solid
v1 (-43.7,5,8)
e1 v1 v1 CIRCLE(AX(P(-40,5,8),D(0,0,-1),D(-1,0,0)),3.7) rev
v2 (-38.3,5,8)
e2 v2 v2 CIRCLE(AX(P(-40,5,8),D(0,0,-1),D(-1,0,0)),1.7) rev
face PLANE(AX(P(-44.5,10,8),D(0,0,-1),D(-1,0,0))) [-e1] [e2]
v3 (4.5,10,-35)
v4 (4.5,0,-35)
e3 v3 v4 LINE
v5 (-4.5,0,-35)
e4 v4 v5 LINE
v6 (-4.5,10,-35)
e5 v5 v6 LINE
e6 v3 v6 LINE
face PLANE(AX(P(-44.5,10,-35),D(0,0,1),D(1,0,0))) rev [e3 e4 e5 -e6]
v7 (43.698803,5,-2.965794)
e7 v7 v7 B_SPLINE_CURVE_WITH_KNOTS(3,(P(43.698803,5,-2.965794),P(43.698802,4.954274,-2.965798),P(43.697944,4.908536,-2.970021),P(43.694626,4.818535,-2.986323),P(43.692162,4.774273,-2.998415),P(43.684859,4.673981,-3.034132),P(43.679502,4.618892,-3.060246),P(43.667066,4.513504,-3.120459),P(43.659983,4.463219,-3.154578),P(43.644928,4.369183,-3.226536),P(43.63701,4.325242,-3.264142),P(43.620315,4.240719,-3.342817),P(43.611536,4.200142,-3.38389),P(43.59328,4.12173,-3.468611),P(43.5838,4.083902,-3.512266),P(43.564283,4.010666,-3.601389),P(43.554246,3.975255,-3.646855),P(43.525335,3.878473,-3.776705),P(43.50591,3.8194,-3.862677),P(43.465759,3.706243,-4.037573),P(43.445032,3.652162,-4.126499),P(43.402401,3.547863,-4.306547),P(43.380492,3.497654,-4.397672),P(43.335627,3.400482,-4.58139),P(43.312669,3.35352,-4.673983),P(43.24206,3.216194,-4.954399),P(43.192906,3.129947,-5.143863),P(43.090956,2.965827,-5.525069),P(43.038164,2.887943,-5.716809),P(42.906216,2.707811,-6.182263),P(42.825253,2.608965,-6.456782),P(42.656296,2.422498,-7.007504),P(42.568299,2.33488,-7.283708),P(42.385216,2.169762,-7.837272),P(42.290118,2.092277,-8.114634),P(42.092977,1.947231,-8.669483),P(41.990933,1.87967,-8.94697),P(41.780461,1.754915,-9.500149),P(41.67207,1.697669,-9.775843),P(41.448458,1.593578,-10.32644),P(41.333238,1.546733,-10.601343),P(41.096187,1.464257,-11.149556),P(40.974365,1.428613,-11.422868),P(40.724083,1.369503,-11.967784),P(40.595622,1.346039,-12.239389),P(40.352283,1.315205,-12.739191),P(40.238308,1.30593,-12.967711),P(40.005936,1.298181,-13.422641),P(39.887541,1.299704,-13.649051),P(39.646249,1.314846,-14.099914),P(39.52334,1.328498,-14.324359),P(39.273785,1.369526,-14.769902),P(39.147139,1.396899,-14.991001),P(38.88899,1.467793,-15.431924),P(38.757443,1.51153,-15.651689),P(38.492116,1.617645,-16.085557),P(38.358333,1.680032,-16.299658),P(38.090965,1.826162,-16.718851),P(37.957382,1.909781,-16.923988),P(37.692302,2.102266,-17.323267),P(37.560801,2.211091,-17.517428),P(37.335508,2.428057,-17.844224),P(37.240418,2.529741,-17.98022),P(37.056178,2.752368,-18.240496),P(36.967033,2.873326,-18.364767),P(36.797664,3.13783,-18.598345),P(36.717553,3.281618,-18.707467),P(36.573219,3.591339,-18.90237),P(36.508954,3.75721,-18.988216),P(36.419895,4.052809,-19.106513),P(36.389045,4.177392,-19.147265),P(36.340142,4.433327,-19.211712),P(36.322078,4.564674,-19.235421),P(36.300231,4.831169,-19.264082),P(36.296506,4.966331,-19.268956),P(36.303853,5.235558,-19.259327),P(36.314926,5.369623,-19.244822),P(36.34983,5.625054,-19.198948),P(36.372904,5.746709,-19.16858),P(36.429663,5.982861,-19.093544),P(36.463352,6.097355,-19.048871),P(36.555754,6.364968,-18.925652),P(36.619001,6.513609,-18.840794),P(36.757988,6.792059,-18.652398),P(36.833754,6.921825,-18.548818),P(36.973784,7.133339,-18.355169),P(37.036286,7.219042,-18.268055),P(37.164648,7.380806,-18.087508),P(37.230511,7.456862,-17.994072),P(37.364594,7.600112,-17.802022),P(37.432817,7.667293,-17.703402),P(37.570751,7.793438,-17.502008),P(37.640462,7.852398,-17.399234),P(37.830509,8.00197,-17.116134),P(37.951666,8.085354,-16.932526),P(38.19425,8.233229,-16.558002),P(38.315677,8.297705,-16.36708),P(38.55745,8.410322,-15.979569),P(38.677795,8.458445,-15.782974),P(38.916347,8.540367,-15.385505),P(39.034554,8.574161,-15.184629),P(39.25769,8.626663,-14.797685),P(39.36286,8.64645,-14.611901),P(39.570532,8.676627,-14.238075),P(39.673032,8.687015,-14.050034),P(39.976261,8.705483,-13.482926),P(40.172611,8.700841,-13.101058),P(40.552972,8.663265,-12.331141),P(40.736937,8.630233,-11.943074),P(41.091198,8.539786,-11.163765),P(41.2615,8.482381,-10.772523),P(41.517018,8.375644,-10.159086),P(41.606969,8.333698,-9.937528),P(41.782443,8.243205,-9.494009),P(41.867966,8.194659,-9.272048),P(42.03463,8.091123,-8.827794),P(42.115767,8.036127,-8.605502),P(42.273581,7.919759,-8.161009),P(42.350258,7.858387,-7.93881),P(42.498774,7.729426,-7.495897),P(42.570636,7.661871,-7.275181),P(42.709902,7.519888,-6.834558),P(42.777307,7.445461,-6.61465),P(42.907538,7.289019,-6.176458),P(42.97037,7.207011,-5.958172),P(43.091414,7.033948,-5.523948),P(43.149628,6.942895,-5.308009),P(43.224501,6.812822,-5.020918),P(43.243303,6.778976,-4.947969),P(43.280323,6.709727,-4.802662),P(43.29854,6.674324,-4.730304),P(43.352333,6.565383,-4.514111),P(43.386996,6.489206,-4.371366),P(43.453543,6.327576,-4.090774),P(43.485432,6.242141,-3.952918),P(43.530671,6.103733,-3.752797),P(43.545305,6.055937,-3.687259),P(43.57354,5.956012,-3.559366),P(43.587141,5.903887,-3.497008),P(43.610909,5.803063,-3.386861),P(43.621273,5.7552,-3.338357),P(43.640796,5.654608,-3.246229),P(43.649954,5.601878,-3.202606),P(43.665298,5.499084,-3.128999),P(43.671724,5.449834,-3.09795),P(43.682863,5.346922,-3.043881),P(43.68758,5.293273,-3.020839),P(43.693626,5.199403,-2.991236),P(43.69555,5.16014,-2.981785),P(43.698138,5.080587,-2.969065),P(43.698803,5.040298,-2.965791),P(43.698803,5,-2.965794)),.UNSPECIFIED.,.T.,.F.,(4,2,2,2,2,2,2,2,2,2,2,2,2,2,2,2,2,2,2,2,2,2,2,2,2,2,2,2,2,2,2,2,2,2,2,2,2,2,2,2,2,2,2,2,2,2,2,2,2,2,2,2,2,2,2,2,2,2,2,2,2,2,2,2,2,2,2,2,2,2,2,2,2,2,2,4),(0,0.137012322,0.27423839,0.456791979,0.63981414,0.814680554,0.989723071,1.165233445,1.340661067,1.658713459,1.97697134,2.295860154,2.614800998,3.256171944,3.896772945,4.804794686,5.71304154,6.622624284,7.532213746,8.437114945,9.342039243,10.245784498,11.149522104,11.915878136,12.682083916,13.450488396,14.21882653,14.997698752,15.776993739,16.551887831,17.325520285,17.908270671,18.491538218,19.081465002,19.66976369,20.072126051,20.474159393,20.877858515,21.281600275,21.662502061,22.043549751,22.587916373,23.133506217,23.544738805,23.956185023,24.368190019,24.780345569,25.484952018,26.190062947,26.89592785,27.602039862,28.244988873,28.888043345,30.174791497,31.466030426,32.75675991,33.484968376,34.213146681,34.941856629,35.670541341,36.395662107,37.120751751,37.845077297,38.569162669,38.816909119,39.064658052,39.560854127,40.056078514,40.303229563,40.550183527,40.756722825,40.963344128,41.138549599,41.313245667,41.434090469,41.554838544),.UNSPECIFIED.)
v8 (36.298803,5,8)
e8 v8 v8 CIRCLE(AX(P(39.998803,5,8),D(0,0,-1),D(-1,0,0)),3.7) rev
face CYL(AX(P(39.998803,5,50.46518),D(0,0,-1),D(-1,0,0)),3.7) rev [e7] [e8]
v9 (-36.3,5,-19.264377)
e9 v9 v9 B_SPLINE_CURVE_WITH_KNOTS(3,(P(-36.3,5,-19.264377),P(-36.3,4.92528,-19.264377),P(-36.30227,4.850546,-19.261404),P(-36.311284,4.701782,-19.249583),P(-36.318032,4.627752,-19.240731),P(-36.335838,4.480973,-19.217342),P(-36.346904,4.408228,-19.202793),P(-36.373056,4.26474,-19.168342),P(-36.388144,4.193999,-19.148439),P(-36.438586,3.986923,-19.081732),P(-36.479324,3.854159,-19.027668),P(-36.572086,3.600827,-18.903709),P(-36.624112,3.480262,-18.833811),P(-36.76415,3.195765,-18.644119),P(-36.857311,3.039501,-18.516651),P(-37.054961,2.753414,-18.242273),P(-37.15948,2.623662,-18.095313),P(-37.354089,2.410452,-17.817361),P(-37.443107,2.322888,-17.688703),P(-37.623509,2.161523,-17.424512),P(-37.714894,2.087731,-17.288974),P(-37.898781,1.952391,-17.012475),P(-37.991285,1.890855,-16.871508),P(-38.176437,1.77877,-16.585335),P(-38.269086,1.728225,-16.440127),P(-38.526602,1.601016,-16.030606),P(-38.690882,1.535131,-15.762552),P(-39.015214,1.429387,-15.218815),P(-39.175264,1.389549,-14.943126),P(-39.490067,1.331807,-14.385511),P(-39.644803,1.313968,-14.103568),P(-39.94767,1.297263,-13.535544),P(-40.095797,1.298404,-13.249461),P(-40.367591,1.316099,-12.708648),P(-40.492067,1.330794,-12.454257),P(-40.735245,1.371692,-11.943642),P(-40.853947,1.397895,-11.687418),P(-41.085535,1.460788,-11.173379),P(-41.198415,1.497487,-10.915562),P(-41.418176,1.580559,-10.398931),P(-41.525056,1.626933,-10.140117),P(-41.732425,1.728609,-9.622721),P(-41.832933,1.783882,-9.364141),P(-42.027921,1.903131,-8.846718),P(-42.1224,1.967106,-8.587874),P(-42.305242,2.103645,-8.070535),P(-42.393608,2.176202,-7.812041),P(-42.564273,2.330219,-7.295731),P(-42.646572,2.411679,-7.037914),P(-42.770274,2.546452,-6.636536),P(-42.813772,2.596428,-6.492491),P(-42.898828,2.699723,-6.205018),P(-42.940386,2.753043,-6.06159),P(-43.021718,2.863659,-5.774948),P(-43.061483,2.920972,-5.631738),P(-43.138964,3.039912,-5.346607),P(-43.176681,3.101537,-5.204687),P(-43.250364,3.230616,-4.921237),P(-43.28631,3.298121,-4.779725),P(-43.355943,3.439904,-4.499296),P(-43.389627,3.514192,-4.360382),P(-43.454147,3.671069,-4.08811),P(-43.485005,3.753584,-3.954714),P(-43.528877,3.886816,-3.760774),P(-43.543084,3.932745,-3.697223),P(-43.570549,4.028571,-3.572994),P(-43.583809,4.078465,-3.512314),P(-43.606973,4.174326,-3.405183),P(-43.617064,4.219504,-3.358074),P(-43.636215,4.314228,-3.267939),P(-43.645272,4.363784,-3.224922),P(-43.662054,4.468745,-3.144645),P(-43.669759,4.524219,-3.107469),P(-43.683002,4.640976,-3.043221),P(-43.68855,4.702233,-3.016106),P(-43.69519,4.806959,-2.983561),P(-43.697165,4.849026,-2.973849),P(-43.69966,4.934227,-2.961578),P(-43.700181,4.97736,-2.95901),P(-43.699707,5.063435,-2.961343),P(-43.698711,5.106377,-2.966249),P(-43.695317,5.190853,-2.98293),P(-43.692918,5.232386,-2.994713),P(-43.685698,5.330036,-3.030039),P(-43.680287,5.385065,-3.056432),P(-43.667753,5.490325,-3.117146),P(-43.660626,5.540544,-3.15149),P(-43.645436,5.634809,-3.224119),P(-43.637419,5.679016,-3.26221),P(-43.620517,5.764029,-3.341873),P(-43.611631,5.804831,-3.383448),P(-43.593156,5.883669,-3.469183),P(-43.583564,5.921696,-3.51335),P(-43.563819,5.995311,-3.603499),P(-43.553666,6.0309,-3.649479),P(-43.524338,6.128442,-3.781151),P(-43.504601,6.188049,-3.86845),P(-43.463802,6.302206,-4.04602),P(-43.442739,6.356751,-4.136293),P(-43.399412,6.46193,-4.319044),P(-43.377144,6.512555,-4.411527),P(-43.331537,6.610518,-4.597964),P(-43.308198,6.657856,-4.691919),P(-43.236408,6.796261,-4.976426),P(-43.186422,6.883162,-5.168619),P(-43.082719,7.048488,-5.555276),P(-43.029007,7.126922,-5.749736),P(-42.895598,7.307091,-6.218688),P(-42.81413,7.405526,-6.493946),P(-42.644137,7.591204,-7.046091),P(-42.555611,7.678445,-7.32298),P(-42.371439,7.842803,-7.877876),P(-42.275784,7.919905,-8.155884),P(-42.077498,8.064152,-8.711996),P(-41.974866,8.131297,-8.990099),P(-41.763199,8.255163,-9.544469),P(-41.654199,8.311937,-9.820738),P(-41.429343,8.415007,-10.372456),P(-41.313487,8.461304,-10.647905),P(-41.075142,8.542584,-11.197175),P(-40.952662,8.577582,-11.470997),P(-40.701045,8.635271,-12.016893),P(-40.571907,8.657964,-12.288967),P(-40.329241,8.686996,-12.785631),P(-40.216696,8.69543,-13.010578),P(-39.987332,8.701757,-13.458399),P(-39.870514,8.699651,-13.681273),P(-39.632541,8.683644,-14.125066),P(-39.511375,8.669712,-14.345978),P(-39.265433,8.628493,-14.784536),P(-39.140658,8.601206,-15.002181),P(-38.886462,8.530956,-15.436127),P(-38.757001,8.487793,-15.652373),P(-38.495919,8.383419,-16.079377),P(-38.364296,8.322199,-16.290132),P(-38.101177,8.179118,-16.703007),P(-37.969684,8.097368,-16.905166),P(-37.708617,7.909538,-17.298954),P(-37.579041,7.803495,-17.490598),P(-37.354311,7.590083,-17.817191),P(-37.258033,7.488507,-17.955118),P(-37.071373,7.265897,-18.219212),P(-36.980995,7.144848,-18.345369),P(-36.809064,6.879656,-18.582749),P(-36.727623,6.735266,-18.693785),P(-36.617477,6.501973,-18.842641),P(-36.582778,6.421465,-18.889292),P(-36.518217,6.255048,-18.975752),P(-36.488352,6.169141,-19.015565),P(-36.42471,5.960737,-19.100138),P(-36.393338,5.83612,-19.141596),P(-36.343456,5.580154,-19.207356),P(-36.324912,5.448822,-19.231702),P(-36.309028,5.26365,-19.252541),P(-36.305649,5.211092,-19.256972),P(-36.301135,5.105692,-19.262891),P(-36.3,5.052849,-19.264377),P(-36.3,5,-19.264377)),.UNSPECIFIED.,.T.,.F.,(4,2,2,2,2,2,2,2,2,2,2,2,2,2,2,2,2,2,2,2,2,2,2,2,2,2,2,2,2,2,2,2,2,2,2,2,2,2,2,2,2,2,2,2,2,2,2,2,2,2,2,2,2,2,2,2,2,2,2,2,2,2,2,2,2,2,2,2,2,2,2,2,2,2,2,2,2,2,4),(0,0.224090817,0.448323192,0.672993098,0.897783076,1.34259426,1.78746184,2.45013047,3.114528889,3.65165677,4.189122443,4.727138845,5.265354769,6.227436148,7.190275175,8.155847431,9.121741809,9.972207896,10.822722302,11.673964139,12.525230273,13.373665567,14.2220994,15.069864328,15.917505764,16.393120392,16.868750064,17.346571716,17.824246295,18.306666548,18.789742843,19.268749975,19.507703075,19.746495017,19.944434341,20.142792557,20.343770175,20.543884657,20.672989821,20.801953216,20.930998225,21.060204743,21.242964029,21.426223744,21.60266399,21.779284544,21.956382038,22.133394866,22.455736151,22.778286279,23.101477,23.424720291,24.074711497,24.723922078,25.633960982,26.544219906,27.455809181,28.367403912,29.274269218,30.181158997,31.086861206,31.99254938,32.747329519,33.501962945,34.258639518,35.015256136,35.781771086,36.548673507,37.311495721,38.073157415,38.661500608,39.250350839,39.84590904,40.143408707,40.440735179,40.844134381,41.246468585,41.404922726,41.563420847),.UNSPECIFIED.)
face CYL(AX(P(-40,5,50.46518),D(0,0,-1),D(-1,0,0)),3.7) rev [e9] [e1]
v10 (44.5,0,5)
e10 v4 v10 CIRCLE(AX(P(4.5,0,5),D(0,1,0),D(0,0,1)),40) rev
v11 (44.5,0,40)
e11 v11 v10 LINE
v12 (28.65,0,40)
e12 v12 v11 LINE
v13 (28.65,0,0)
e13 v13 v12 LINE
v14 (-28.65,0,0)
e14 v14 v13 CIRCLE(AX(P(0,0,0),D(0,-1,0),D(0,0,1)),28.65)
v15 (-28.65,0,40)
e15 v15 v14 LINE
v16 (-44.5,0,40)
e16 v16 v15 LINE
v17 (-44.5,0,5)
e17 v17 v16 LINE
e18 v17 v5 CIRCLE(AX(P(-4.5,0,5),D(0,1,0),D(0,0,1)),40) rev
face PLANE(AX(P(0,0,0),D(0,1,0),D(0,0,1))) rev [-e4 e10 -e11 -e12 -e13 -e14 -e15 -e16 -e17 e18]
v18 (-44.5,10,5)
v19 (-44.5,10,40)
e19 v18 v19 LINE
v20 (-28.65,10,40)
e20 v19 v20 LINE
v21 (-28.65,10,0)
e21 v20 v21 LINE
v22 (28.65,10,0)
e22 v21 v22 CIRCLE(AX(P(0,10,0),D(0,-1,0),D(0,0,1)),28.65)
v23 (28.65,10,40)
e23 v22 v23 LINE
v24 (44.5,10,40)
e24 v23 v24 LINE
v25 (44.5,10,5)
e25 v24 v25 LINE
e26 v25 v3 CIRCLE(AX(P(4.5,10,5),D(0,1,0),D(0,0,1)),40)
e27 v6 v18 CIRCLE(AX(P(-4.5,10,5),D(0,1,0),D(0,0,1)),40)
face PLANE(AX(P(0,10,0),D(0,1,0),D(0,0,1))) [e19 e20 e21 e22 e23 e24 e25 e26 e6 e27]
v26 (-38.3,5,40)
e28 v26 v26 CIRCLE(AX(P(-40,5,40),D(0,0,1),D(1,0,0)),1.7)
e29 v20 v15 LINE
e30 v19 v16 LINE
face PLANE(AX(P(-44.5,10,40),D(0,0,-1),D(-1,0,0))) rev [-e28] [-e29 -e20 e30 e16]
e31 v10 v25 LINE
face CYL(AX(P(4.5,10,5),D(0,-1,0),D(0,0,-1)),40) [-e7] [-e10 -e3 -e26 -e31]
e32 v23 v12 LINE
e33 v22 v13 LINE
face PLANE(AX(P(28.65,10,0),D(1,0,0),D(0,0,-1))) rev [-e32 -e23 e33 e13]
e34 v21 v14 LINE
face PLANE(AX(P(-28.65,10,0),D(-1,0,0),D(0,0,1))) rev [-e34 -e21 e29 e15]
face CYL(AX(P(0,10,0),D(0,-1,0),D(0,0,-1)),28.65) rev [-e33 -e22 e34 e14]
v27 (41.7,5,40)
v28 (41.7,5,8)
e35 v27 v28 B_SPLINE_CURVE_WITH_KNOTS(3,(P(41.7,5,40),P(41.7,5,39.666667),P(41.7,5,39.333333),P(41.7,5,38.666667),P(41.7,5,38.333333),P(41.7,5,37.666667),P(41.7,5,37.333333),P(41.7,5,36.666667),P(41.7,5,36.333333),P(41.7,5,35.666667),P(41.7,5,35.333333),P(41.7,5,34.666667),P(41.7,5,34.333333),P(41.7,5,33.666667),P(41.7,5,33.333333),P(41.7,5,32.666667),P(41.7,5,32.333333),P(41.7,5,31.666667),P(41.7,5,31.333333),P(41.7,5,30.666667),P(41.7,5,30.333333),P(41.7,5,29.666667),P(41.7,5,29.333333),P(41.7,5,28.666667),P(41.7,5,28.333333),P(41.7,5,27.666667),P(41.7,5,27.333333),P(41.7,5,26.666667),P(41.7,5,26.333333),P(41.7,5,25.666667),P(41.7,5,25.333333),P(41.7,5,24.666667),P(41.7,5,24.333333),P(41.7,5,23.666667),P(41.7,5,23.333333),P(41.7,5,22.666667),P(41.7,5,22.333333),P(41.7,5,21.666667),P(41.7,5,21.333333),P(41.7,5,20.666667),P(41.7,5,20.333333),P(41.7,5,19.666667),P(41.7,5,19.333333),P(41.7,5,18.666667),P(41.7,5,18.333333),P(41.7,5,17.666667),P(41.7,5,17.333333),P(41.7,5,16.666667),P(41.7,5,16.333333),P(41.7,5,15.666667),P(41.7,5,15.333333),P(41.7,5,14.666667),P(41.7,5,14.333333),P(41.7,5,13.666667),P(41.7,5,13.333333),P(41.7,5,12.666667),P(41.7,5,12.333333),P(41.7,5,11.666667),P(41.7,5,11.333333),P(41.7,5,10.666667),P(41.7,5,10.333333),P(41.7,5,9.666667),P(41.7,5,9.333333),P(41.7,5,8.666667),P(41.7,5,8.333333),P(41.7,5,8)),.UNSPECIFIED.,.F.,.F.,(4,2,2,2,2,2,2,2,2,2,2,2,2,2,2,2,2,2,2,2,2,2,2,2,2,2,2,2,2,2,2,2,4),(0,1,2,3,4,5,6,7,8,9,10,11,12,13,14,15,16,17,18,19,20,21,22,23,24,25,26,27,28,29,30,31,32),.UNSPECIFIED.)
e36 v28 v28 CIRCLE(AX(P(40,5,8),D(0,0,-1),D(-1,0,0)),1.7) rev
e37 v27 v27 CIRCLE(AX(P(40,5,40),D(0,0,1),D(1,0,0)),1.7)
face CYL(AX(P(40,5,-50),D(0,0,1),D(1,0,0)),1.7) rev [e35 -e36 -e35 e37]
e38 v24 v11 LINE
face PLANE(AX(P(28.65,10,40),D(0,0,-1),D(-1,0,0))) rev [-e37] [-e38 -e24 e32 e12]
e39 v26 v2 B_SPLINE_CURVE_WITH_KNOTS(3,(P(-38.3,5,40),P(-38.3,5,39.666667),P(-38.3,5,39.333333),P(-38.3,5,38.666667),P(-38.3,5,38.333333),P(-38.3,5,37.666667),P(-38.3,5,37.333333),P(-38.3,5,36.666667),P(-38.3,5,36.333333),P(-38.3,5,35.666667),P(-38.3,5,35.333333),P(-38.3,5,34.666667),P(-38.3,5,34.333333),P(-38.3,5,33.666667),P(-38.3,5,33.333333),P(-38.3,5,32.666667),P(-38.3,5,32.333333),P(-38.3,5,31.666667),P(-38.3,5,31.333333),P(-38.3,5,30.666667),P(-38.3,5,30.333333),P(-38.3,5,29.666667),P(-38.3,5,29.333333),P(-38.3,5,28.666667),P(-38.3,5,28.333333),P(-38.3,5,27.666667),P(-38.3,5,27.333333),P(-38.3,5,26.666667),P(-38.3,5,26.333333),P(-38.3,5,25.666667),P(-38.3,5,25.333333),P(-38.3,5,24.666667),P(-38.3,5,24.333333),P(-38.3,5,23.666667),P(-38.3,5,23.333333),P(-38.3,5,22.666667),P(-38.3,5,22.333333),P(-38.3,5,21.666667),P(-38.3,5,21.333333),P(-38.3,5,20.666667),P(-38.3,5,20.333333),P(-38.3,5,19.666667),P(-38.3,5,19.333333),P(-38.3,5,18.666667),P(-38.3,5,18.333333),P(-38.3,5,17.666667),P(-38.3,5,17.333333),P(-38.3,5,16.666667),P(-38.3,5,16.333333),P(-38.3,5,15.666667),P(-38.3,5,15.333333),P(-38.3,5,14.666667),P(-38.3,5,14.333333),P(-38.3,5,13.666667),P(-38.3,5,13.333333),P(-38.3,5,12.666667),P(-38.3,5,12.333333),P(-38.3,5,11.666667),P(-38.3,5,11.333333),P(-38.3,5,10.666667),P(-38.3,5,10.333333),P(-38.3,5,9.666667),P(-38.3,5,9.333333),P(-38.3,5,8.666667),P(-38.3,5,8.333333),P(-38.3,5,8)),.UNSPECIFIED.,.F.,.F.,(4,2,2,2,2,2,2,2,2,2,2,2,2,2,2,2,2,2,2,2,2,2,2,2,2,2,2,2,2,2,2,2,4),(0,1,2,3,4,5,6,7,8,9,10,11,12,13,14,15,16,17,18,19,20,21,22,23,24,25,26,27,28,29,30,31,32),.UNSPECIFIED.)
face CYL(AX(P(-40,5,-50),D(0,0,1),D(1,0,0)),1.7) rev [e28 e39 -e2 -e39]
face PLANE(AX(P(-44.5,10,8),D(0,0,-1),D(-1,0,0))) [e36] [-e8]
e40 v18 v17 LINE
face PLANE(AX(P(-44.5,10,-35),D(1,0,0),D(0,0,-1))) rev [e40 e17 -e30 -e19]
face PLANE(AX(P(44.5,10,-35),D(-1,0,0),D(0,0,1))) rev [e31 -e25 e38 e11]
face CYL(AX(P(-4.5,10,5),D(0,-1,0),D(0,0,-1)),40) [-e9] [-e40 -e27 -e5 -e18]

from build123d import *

# Parameters (mm, degrees)
EXTRUDE_1_DEPTH     = 10
SKETCH_2_R          = 1.7
CUT_EXTRUDE_1_DEPTH = 90
SKETCH_3_R          = 3.7
CUT_EXTRUDE_2_DEPTH = 43
FILLET_1_R          = 40


with BuildPart() as part:
    # 草图1 → 凸台-拉伸1 (new body)
    with BuildSketch(Plane(origin=(0, 0, 0), x_dir=(1, 0, 0), z_dir=(0, 1, 0))):
        with BuildLine():
            Line((28.65, -40), (44.5, -40))
            Line((44.5, -40), (44.5, 35))
            Line((44.5, 35), (-44.5, 35))
            Line((-44.5, 35), (-44.5, -40))
            Line((-44.5, -40), (-28.65, -40))
            Line((-28.65, -40), (-28.65, 0))
            ThreePointArc((-28.65, 0), (0, 28.65), (28.65, 0))
            Line((28.65, 0), (28.65, -40))
        make_face()
    extrude(amount=EXTRUDE_1_DEPTH)

    # 草图2 → 切除-拉伸1 (cut)
    with BuildSketch(Plane.XY.offset(40)):
        with Locations((-40, 5)):
            Circle(SKETCH_2_R)
        with Locations((40, 5)):
            Circle(SKETCH_2_R)
    extrude(amount=-CUT_EXTRUDE_1_DEPTH, mode=Mode.SUBTRACT)

    # 草图3 → 切除-拉伸2 (cut)
    with BuildSketch(Plane(origin=(0, 0, -35), x_dir=(-1, 0, 0), z_dir=(0, 0, -1))):
        with Locations((40, 5)):
            Circle(SKETCH_3_R)
        with Locations((-39.998802569, 5)):
            Circle(SKETCH_3_R)
    extrude(amount=-CUT_EXTRUDE_2_DEPTH, mode=Mode.SUBTRACT)

    # 圆角1
    # the kernel refuses this fillet: 40 mm, written as the material it takes off along each edge
    with BuildSketch(Plane(origin=(-44.5, -100, -35), x_dir=(1, 0, 0), z_dir=(0, 1, 0)), Plane(origin=(44.5, -100, -35), x_dir=(0, 0, 1), z_dir=(0, 1, 0))) as fillet_1_piece_1:
        with BuildLine():
            CenterArc((FILLET_1_R, -FILLET_1_R), FILLET_1_R, 90, 90)
            Line((0, -FILLET_1_R), (0, 0))
            Line((0, 0), (FILLET_1_R, 0))
        make_face()
    extrude(amount=210, mode=Mode.SUBTRACT)


solid = part.part
